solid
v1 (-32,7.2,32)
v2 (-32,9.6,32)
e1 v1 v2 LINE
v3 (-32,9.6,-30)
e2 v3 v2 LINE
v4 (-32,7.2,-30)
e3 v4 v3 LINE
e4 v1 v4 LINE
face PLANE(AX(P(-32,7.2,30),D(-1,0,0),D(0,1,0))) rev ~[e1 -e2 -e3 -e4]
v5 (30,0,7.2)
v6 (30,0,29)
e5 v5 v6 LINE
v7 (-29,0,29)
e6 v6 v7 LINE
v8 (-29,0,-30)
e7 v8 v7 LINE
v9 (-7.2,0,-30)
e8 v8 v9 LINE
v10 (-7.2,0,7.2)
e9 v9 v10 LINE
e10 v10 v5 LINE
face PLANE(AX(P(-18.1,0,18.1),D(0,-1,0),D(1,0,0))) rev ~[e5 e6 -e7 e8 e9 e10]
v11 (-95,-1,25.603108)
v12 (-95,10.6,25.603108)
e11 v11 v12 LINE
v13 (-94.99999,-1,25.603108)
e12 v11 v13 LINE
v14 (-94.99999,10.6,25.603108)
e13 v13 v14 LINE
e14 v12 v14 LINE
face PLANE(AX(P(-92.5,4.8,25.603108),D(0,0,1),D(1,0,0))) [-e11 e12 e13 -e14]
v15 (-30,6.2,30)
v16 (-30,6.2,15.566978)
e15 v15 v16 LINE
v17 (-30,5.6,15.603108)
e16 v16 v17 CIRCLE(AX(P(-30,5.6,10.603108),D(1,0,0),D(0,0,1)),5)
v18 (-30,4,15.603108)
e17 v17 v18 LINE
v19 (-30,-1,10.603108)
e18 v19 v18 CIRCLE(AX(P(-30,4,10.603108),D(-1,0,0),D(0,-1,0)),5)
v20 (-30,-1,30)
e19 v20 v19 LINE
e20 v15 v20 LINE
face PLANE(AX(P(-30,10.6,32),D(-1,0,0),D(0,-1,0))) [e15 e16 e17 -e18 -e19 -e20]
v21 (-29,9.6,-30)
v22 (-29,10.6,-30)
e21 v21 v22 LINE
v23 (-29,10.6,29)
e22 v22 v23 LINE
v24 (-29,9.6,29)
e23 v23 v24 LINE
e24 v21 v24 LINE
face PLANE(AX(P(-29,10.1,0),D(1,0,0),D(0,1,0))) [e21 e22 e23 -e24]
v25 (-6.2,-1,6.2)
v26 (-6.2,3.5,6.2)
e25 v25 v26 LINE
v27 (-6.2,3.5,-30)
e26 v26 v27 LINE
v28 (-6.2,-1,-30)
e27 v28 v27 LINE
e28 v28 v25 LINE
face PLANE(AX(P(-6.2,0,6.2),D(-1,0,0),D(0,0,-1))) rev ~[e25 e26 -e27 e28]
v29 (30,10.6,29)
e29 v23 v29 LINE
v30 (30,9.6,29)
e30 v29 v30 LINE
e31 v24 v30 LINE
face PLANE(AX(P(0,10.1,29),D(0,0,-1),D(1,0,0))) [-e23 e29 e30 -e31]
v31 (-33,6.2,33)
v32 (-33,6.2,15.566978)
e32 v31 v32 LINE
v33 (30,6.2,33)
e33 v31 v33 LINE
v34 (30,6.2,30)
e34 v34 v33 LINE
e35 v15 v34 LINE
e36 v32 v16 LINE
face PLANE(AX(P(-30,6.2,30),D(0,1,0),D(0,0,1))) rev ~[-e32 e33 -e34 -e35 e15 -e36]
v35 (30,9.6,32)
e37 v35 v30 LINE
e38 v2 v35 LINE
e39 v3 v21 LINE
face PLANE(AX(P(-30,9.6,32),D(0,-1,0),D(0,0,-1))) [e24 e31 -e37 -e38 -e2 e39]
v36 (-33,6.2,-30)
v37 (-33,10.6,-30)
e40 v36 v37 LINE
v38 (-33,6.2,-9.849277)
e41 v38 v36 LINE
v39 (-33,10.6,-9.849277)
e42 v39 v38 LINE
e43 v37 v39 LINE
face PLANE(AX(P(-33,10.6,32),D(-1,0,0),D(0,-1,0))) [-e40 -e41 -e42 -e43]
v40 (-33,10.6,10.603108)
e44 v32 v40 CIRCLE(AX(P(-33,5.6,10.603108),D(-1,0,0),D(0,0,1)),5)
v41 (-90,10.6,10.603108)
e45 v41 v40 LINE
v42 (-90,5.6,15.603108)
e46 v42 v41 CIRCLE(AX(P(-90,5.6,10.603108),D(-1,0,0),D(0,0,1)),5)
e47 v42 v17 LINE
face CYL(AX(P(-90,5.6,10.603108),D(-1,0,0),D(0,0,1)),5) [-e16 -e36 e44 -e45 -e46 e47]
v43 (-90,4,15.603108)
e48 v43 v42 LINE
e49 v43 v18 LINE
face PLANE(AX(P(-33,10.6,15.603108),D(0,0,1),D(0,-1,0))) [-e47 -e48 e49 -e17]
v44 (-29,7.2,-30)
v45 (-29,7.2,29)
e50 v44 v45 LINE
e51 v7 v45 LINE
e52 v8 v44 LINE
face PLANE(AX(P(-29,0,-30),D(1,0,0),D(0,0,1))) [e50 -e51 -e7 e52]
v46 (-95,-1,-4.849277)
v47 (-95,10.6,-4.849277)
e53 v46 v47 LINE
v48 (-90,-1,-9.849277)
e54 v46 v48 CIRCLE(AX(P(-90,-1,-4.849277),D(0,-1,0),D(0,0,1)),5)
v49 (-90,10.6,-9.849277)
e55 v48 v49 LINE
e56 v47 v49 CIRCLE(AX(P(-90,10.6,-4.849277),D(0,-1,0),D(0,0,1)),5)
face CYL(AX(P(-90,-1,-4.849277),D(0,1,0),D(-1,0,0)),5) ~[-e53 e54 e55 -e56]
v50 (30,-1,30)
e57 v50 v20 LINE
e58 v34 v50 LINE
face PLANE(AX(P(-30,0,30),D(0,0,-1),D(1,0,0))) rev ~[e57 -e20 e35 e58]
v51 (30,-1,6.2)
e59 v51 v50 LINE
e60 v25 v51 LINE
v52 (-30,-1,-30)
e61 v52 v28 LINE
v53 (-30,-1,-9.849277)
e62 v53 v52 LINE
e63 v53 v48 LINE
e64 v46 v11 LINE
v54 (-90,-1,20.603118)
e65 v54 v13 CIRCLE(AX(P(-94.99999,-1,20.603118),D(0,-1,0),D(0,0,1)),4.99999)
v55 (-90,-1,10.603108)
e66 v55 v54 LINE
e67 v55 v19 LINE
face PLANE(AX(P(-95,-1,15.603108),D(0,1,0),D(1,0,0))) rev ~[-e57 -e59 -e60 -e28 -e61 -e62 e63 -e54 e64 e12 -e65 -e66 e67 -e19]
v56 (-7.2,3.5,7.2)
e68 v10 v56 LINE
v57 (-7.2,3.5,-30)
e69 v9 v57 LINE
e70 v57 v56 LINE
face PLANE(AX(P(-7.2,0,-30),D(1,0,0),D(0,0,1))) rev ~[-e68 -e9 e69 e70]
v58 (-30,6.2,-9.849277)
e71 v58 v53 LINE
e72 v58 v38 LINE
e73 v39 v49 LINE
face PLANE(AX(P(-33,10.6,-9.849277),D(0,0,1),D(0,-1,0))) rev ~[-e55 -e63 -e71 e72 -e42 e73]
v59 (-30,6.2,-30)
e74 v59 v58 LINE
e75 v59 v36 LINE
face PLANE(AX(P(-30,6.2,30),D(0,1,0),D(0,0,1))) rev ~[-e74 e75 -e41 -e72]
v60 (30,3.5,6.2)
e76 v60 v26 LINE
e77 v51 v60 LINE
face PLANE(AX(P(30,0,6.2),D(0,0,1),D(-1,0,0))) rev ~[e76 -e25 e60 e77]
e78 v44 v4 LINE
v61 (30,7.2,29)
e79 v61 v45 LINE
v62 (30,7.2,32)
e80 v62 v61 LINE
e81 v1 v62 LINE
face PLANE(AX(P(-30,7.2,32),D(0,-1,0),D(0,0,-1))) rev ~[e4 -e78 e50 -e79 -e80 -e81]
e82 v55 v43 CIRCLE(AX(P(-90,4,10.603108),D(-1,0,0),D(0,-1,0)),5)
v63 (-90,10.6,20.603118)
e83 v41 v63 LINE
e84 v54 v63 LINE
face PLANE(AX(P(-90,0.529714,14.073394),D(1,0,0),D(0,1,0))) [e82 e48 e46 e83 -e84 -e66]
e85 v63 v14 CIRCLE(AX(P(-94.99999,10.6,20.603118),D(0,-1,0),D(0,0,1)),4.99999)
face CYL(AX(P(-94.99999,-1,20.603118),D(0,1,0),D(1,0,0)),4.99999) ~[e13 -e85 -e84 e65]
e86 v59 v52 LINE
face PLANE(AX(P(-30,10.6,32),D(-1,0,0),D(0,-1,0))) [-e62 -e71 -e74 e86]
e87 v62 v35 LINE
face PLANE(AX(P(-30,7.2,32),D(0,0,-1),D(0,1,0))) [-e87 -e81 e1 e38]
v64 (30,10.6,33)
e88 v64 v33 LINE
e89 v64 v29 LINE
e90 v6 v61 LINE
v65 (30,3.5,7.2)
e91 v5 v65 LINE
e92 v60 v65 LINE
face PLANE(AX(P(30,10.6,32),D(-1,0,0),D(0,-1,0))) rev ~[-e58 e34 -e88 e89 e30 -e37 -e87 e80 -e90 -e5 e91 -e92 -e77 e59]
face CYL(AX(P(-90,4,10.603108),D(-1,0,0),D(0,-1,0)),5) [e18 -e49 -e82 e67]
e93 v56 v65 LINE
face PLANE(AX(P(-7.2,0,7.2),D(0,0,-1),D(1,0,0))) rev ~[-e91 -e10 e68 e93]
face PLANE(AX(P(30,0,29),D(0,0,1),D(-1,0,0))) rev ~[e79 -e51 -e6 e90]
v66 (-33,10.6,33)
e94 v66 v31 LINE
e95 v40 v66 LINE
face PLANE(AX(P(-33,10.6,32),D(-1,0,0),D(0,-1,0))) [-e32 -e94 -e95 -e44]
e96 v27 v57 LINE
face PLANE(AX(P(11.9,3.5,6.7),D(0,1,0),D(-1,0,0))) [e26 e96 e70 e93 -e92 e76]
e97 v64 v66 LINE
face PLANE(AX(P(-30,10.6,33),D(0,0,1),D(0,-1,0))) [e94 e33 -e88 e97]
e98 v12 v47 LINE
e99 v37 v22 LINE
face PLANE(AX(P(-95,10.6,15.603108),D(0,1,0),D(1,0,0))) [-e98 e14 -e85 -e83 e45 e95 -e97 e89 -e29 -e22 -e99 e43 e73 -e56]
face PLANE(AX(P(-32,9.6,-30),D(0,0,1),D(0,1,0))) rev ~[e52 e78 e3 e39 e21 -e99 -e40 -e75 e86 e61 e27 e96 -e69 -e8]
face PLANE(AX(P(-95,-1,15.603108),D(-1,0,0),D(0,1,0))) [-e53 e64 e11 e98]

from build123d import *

# Parameters (mm, degrees)
F0_W         = 23.8
F0_H         = 23.8
F0_W_2       = 36.2
F0_H_2       = 36.2
F1_DEPTH     = 1
F2_W         = 59
F2_H         = 1
F2_W_2       = 1
F2_H_2       = 59
F3_DEPTH     = 7.2
F4_W         = 36.2
F4_H         = 1
F5_DEPTH     = 3.5
F6_W         = 60
F6_H         = 1
F7_DEPTH     = 3
F8_W         = 60
F8_H         = 1
F9_DEPTH     = 3.4
F10_W        = 60
F10_H        = 1
F11_DEPTH    = 3
F12_W        = 1
F12_H        = 60
F13_DEPTH    = 3
F14_W        = 1
F14_H        = 60
F15_DEPTH    = 3.4
F16_W        = 1
F16_H        = 60
F17_DEPTH    = 3
F18_DEPTH    = 3
F19_DEPTH    = 2
F20_W        = 7.2
F20_H        = 25.4523856565
F21_DEPTH    = 65
F22_W        = 4.4
F22_H        = 25.4523856565
F23_DEPTH    = 62
F24_W        = 5
F24_H        = 11.6
F25_DEPTH    = 10
F26_R        = 4.99999
F27_T1_DEPTH = 60
F27_T3_DEPTH = 57
F27_T8_DEPTH = 69.5
F28_R        = 5


# Not quite as in the source:
# - a fillet or chamfer that OpenCascade refuses, or shapes differently, is made with other operations: its cross-section is extruded or revolved along the edge and cut away or added
# - a fillet or chamfer is up to 0.001 mm smaller than in the source, because OpenCascade refuses the exact size


with BuildPart() as f1:
    # F0 (on Front) → F1 (new body)
    with BuildSketch(Plane.XZ):
        with Locations((-18.1, 18.1)):
            Rectangle(F0_W, F0_H)
        with Locations((11.9, 18.1)):
            Rectangle(F0_W_2, F0_H)
        with Locations((-18.1, -11.9)):
            Rectangle(F0_W, F0_H_2)
    extrude(amount=F1_DEPTH)

    # F2 (on face) → F3 (join)
    with BuildSketch(Plane(origin=(0, 0, 0), x_dir=(-1, 0, 0), z_dir=(0, 1, 0))):
        with Locations((-0.5, 29.5)):
            Rectangle(F2_W, F2_H)
        with Locations((29.5, 29.5)):
            Rectangle(F2_W_2, F2_H)
        with Locations((29.5, -0.5)):
            Rectangle(F2_W_2, F2_H_2)
    extrude(amount=F3_DEPTH)

    # F4 (on face) → F5 (join)
    with BuildSketch(Plane(origin=(0, 0, 0), x_dir=(-1, 0, 0), z_dir=(0, 1, 0))):
        with Locations((-11.9, 6.7)):
            Rectangle(F4_W, F4_H)
        Polygon((6.2, 7.2), (6.2, 6.2), (6.2, -30), (7.2, -30), (7.2, 7.2), align=None)
    extrude(amount=F5_DEPTH)

    # F6 (on face) → F7 (join)
    with BuildSketch(Plane.XY.offset(30)):
        with Locations((0, 6.7)):
            Rectangle(F6_W, F6_H)
    extrude(amount=F7_DEPTH)

    # F8 (on face) → F9 (join)
    with BuildSketch(Plane(origin=(0, 7.2, 0), x_dir=(-1, 0, 0), z_dir=(0, 1, 0))):
        with Locations((0, 32.5)):
            Rectangle(F8_W, F8_H)
    extrude(amount=F9_DEPTH)

    # F10 (on face) → F11 (join)
    with BuildSketch(Plane(origin=(0, 0, 32), x_dir=(1, 0, 0), z_dir=(0, 0, -1))):
        with Locations((0, -10.1)):
            Rectangle(F10_W, F10_H)
    extrude(amount=F11_DEPTH)

    # F12 (on face) → F13 (join)
    with BuildSketch(Plane(origin=(-30, 0, 0), x_dir=(0, -1, 0), z_dir=(-1, 0, 0))):
        with Locations((-6.7, 0)):
            Rectangle(F12_W, F12_H)
    extrude(amount=F13_DEPTH)

    # F14 (on face) → F15 (join)
    with BuildSketch(Plane(origin=(0, 7.2, 0), x_dir=(-1, 0, 0), z_dir=(0, 1, 0))):
        with Locations((32.5, 0)):
            Rectangle(F14_W, F14_H)
    extrude(amount=F15_DEPTH)

    # F16 (on face) → F17 (join)
    with BuildSketch(Plane.YZ.offset(-32)):
        with Locations((10.1, 0)):
            Rectangle(F16_W, F16_H)
    extrude(amount=F17_DEPTH)

    # F18 (add): a face of the model
    f18_faces = [f1.faces().sort_by_distance(p)[0] for p in [
        (-30, 6.2532541078, 31.5),
    ]]
    extrude(f18_faces, amount=F18_DEPTH)

    # F19 (add): a face of the model
    f19_faces = [f1.faces().sort_by_distance(p)[0] for p in [
        (-32.5, 8.4, 30),
    ]]
    extrude(f19_faces, amount=F19_DEPTH)

    # F20 (on face) → F21 (join)
    with BuildSketch(Plane(origin=(-30, 0, 0), x_dir=(0, -1, 0), z_dir=(-1, 0, 0))):
        with Locations((-2.6, 2.8769155033)):
            Rectangle(F20_W, F20_H)
    extrude(amount=F21_DEPTH)

    # F22 (on face) → F23 (join)
    with BuildSketch(Plane(origin=(-33, 0, 0), x_dir=(0, -1, 0), z_dir=(-1, 0, 0))):
        with Locations((-8.4, 2.8769155033)):
            Rectangle(F22_W, F22_H)
    extrude(amount=F23_DEPTH)

    # F24 (on face) → F25 (join)
    with BuildSketch(Plane.XY.offset(15.6031083316)):
        with Locations((-92.5, 4.8)):
            Rectangle(F24_W, F24_H)
    extrude(amount=F25_DEPTH)

    # F26 (radius 5 in the source; OpenCascade refuses exactly that, so slightly less here)
    f26_edges = [f1.edges().sort_by_distance(p)[0] for p in [
        (-90, 4.8, 25.603108),
    ]]
    fillet(f26_edges, radius=F26_R)

    # F27: fillet of radius 5 on 2 edges, made by hand

    # F27_s2 → F27_t1 (cut)
    with BuildSketch(Plane.YZ.offset(-90)):
        with BuildLine():
            ThreePointArc((-1, 10.6031083316), (0.4644660941, 14.1386422375), (4, 15.6031083316))
            Line((4, 15.6031083316), (-1, 15.6031083316))
            Line((-1, 15.6031083316), (-1, 10.6031083316))
        make_face()
    extrude(amount=F27_T1_DEPTH, mode=Mode.SUBTRACT)

    # F27_s4 → F27_t3 (cut)
    with BuildSketch(Plane.YZ.offset(-90)):
        with BuildLine():
            ThreePointArc((5.6, 15.6031083316), (9.1355339059, 14.1386422375), (10.6, 10.6031083316))
            Line((10.6, 10.6031083316), (10.6, 15.6031083316))
            Line((10.6, 15.6031083316), (5.6, 15.6031083316))
        make_face()
    extrude(amount=F27_T3_DEPTH, mode=Mode.SUBTRACT)


with BuildPart() as f27_tool6:
    # F27_s7 → F27_t8 (new body)
    with BuildSketch(Plane.YZ.offset(-20.5)):
        with BuildLine():
            ThreePointArc((5.6, 15.6031083316), (9.1355339059, 14.1386422375), (10.6, 10.6031083316))
            Line((10.6, 10.6031083316), (10.6, 15.6031083316))
            Line((10.6, 15.6031083316), (5.6, 15.6031083316))
        make_face()
    extrude(amount=-F27_T8_DEPTH)

    split(bisect_by=Plane.YZ.offset(-30), keep=Keep.BOTTOM)

    split(bisect_by=Plane.XZ.offset(-6.2), keep=Keep.TOP)


with BuildPart() as f1_1:
    add(f1.part)

    # F27_t5: cut F27_tool6
    add(f27_tool6.part, mode=Mode.SUBTRACT)

    # F28
    f28_edges = [f1_1.edges().sort_by_distance(p)[0] for p in [
        (-95, 4.8, -9.849277),
    ]]
    fillet(f28_edges, radius=F28_R)


solid = f1_1.part
